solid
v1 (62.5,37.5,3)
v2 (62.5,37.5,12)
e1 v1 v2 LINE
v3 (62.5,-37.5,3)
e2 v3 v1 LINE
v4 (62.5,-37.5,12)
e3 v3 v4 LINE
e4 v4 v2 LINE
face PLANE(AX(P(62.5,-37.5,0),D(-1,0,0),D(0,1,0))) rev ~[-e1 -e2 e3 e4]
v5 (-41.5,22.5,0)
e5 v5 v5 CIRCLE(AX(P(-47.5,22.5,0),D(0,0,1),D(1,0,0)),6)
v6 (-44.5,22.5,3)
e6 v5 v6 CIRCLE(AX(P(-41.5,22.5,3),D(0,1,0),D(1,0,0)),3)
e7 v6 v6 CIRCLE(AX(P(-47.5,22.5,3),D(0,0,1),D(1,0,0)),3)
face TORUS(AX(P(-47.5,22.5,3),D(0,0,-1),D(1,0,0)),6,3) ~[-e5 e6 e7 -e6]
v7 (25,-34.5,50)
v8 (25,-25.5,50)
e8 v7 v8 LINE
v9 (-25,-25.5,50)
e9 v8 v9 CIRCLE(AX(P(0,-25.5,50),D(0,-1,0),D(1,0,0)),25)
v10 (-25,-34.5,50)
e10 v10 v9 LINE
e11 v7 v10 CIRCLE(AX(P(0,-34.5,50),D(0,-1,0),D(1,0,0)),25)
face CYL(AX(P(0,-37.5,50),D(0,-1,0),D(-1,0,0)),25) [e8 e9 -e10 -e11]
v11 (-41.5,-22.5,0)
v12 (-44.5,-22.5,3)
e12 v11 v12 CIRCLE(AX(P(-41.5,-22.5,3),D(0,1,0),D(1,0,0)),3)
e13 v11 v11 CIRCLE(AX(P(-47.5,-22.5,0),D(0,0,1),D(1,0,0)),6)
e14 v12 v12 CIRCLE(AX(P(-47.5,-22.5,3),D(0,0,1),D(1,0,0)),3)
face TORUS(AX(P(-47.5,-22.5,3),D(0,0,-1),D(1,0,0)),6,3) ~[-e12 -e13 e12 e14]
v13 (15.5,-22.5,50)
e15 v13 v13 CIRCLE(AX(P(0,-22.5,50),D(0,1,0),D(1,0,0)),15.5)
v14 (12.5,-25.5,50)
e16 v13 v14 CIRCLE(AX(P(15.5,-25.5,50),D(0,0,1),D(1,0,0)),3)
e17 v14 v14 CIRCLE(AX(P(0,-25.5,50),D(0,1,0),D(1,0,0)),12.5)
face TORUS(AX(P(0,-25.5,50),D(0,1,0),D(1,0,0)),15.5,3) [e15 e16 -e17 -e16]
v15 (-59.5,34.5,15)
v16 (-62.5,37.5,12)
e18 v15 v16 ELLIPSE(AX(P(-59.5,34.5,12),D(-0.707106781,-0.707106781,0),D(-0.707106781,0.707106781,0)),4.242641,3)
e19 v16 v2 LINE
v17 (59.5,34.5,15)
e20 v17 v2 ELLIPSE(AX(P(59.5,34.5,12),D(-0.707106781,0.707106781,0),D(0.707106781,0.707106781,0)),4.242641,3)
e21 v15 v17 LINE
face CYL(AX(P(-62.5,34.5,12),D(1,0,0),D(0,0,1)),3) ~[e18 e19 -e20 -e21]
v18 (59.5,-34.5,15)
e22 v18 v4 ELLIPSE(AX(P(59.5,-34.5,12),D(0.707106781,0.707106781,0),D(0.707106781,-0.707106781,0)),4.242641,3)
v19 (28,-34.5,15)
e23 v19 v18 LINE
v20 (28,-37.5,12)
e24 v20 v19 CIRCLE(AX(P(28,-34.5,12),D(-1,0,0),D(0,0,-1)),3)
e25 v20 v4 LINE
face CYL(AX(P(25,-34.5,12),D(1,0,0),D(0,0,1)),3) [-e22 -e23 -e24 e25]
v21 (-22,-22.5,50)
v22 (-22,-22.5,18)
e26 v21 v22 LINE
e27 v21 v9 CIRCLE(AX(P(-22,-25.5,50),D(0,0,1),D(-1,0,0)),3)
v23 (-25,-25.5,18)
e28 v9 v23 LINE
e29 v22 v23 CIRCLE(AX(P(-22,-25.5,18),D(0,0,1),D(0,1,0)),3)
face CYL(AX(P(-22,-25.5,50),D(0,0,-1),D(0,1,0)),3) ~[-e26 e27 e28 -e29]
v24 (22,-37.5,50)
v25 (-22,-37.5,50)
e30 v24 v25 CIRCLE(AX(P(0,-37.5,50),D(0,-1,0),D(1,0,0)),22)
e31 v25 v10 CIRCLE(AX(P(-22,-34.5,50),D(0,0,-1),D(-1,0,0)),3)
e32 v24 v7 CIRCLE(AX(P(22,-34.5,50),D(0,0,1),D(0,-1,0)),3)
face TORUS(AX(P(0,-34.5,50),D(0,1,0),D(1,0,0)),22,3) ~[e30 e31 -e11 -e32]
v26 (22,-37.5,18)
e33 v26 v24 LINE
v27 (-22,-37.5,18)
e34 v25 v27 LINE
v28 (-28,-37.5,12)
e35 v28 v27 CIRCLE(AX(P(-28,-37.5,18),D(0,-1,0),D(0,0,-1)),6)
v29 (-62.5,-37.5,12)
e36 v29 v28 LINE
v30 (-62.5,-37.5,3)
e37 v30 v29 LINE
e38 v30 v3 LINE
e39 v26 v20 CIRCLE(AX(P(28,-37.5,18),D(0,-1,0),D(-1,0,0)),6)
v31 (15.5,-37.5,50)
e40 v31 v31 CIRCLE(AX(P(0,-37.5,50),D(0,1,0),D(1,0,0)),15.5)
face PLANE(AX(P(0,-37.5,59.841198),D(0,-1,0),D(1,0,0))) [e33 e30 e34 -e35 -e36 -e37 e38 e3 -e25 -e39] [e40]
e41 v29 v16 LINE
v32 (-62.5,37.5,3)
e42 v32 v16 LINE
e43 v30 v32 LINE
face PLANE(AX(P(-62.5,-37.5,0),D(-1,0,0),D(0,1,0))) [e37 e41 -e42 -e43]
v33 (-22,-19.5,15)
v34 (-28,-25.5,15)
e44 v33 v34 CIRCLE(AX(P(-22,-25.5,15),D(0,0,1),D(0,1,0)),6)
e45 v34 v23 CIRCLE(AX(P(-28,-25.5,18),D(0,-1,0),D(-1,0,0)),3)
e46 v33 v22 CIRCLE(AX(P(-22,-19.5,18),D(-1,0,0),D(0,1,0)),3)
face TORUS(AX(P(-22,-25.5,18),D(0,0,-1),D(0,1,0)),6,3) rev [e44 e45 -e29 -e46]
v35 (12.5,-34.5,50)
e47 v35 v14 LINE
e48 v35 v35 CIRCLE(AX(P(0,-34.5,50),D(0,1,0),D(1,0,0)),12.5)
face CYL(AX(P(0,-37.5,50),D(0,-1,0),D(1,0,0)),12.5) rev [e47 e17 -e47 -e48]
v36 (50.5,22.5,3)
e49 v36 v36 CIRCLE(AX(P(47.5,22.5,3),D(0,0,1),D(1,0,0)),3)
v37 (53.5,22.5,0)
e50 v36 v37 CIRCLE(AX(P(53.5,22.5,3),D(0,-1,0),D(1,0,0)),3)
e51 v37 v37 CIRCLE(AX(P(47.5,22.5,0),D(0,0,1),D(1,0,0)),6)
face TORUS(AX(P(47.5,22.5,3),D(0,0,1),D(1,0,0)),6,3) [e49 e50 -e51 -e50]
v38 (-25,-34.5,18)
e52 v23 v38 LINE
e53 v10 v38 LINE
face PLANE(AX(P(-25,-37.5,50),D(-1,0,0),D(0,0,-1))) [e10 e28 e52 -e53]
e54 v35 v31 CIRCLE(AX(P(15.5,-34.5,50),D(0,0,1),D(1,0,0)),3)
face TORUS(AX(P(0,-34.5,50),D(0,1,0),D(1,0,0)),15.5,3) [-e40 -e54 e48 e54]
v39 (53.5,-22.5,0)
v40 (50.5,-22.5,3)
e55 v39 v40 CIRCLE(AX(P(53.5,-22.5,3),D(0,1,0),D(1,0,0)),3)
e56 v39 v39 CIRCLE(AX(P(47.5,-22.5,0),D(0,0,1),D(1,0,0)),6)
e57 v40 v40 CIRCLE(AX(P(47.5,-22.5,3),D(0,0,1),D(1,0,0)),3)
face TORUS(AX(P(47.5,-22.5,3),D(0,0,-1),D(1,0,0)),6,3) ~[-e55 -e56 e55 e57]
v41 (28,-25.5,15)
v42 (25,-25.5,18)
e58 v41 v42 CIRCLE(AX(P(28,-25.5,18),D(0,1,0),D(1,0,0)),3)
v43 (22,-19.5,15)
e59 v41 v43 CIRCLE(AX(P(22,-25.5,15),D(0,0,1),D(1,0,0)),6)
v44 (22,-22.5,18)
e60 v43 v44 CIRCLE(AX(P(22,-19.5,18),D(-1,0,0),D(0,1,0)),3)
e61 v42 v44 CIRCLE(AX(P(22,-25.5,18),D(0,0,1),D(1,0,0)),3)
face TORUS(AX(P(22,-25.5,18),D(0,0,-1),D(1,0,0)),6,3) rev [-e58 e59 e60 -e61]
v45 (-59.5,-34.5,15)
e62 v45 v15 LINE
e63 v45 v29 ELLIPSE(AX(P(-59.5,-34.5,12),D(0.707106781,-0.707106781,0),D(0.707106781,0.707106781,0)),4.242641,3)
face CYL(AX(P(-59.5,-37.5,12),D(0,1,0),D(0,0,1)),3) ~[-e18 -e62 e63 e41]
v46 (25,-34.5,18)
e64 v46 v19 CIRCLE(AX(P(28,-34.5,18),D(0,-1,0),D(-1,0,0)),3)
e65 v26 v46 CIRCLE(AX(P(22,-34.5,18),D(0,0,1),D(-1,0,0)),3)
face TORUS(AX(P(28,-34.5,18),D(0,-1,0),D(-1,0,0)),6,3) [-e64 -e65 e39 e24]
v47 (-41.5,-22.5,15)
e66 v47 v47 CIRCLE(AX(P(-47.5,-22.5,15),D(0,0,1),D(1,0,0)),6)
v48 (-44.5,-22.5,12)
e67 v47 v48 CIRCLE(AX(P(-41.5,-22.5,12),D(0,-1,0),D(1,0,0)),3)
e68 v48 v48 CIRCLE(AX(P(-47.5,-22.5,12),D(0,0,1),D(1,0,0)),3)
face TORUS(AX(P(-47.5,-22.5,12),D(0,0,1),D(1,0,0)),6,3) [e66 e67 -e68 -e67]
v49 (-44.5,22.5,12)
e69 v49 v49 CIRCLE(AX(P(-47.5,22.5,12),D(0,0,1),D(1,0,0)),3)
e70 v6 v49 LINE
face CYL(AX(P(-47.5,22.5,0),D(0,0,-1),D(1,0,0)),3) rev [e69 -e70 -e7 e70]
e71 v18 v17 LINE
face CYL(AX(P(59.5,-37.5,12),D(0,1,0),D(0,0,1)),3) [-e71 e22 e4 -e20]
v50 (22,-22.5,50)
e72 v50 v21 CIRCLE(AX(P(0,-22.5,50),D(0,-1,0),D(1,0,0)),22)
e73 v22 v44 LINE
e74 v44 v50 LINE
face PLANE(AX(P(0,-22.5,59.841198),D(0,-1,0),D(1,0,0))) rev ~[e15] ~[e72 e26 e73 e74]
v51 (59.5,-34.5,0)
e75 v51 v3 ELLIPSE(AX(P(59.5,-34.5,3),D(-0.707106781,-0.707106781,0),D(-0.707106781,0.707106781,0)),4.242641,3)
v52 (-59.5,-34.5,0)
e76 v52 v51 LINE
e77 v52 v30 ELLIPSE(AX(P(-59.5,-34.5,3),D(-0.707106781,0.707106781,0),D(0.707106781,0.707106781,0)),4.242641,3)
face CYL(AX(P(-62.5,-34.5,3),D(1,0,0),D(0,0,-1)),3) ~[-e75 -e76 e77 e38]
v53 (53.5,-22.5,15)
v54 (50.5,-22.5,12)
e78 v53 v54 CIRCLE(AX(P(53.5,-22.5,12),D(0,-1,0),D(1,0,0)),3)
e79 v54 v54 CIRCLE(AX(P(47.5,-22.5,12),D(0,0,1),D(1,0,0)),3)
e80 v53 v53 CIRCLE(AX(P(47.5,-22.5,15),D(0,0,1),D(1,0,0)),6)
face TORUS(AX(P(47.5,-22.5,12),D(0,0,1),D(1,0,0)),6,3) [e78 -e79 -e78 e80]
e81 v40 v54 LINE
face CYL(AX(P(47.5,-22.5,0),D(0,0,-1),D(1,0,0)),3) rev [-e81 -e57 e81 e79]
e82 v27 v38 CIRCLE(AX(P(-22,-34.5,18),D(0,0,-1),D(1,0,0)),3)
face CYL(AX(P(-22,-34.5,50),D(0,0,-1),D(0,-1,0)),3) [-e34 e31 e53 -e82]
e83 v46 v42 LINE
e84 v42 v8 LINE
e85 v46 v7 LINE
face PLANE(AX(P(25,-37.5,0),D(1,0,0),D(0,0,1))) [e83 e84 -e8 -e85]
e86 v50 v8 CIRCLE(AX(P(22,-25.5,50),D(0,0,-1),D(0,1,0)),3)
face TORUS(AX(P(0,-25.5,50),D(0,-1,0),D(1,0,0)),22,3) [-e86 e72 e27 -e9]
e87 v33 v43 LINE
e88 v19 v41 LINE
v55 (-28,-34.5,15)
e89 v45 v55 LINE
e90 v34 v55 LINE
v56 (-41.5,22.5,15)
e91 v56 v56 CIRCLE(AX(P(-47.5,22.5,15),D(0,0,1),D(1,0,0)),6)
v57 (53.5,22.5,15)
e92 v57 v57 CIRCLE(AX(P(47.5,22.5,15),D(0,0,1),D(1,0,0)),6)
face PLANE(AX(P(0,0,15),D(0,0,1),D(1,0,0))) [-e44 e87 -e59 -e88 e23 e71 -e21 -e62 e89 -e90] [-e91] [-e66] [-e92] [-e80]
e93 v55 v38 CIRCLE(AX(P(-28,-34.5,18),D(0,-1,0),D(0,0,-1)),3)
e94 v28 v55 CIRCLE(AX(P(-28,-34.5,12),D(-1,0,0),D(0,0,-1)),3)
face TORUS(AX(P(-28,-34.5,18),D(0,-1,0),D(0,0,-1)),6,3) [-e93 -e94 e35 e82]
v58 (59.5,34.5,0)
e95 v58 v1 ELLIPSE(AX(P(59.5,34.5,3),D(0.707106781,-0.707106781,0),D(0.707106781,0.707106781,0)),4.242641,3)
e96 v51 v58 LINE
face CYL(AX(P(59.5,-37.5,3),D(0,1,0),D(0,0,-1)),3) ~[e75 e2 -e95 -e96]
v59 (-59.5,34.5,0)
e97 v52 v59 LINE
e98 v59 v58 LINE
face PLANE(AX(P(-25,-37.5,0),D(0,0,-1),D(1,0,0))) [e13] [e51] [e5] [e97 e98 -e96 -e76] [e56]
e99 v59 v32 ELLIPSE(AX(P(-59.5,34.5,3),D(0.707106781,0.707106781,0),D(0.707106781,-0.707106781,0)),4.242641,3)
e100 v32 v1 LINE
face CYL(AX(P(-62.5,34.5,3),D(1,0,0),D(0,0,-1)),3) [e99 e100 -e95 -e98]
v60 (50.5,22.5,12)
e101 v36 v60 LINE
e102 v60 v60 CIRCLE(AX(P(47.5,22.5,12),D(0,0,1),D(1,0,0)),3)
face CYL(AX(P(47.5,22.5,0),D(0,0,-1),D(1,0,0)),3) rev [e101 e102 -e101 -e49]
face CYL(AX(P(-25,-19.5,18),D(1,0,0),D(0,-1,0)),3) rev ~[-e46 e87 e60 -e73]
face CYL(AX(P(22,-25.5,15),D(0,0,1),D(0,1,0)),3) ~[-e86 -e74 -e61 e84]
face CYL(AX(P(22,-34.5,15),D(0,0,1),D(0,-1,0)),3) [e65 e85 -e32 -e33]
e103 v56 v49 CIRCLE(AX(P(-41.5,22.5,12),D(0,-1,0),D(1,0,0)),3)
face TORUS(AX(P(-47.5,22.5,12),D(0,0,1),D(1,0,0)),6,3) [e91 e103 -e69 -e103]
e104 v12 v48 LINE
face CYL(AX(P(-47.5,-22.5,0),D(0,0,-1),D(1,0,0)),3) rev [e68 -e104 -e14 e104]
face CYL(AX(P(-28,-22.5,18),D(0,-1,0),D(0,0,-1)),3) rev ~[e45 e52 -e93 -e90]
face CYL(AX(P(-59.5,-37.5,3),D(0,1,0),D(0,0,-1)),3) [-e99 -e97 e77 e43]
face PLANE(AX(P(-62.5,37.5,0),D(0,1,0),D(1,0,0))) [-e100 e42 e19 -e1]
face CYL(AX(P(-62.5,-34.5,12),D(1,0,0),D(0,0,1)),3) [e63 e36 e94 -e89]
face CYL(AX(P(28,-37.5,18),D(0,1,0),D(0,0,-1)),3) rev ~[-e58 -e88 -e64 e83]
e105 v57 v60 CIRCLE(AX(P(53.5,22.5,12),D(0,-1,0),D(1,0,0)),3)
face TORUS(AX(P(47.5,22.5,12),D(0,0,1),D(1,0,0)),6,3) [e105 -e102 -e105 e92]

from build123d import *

# Parameters (mm, degrees)
F0_W     = 125
F0_H     = 75
F0_R     = 3
F1_DEPTH = 15
F2_W     = 50
F2_H     = 15
F3_DEPTH = 15
F4_R     = 3


with BuildPart() as f1:
    # F0 (on Top) → F1 (new body)
    with BuildSketch(Plane.XY):
        Rectangle(F0_W, F0_H)
        with Locations((-47.5, -22.5)):
            Circle(F0_R, mode=Mode.SUBTRACT)
        with Locations((47.5, -22.5)):
            Circle(F0_R, mode=Mode.SUBTRACT)
        with Locations((-47.5, 22.5)):
            Circle(F0_R, mode=Mode.SUBTRACT)
        with Locations((47.5, 22.5)):
            Circle(F0_R, mode=Mode.SUBTRACT)
    extrude(amount=F1_DEPTH)

    # F2 (on face) → F3 (join)
    with BuildSketch(Plane.XZ.offset(37.5)):
        with BuildLine():
            Line((12.5, 50), (25, 50))
            ThreePointArc((25, 50), (0, 75), (-25, 50))
            Line((-25, 50), (-12.5, 50))
            ThreePointArc((-12.5, 50), (0, 62.5), (12.5, 50))
        make_face()
        with BuildLine():
            ThreePointArc((-25, 50), (0, 25), (25, 50))
            Line((25, 50), (12.5, 50))
            ThreePointArc((12.5, 50), (0, 37.5), (-12.5, 50))
            Line((-12.5, 50), (-25, 50))
        make_face()
        with BuildLine():
            Line((25, 15), (25, 50))
            ThreePointArc((25, 50), (0, 25), (-25, 50))
            Line((-25, 50), (-25, 15))
            Line((-25, 15), (25, 15))
        make_face()
        with Locations((0, 7.5)):
            Rectangle(F2_W, F2_H)
    extrude(amount=-F3_DEPTH)

    # F4
    f4_edges = [f1.edges().sort_by_distance(p)[0] for p in [
        (43.75, -37.5, 15),
        (25, -30, 15),
        (0, -22.5, 15),
        (-25, -30, 15),
        (-43.75, -37.5, 15),
        (-62.5, 0, 15),
        (0, 37.5, 15),
        (62.5, 0, 15),
        (-50.5, -22.5, 15),
        (44.5, -22.5, 15),
        (-50.5, 22.5, 15),
        (44.5, 22.5, 15),
        (25, -22.5, 32.5),
        (-25, -22.5, 32.5),
        (0, -22.5, 75),
        (-12.5, -22.5, 50),
        (-12.5, -37.5, 50),
        (62.5, 0, 0),
        (0, 37.5, 0),
        (-62.5, 0, 0),
        (0, -37.5, 0),
        (-50.5, -22.5, 0),
        (44.5, -22.5, 0),
        (-50.5, 22.5, 0),
        (44.5, 22.5, 0),
        (-25, -37.5, 32.5),
        (0, -37.5, 75),
        (25, -37.5, 32.5),
    ]]
    fillet(f4_edges, radius=F4_R)


solid = f1.part
